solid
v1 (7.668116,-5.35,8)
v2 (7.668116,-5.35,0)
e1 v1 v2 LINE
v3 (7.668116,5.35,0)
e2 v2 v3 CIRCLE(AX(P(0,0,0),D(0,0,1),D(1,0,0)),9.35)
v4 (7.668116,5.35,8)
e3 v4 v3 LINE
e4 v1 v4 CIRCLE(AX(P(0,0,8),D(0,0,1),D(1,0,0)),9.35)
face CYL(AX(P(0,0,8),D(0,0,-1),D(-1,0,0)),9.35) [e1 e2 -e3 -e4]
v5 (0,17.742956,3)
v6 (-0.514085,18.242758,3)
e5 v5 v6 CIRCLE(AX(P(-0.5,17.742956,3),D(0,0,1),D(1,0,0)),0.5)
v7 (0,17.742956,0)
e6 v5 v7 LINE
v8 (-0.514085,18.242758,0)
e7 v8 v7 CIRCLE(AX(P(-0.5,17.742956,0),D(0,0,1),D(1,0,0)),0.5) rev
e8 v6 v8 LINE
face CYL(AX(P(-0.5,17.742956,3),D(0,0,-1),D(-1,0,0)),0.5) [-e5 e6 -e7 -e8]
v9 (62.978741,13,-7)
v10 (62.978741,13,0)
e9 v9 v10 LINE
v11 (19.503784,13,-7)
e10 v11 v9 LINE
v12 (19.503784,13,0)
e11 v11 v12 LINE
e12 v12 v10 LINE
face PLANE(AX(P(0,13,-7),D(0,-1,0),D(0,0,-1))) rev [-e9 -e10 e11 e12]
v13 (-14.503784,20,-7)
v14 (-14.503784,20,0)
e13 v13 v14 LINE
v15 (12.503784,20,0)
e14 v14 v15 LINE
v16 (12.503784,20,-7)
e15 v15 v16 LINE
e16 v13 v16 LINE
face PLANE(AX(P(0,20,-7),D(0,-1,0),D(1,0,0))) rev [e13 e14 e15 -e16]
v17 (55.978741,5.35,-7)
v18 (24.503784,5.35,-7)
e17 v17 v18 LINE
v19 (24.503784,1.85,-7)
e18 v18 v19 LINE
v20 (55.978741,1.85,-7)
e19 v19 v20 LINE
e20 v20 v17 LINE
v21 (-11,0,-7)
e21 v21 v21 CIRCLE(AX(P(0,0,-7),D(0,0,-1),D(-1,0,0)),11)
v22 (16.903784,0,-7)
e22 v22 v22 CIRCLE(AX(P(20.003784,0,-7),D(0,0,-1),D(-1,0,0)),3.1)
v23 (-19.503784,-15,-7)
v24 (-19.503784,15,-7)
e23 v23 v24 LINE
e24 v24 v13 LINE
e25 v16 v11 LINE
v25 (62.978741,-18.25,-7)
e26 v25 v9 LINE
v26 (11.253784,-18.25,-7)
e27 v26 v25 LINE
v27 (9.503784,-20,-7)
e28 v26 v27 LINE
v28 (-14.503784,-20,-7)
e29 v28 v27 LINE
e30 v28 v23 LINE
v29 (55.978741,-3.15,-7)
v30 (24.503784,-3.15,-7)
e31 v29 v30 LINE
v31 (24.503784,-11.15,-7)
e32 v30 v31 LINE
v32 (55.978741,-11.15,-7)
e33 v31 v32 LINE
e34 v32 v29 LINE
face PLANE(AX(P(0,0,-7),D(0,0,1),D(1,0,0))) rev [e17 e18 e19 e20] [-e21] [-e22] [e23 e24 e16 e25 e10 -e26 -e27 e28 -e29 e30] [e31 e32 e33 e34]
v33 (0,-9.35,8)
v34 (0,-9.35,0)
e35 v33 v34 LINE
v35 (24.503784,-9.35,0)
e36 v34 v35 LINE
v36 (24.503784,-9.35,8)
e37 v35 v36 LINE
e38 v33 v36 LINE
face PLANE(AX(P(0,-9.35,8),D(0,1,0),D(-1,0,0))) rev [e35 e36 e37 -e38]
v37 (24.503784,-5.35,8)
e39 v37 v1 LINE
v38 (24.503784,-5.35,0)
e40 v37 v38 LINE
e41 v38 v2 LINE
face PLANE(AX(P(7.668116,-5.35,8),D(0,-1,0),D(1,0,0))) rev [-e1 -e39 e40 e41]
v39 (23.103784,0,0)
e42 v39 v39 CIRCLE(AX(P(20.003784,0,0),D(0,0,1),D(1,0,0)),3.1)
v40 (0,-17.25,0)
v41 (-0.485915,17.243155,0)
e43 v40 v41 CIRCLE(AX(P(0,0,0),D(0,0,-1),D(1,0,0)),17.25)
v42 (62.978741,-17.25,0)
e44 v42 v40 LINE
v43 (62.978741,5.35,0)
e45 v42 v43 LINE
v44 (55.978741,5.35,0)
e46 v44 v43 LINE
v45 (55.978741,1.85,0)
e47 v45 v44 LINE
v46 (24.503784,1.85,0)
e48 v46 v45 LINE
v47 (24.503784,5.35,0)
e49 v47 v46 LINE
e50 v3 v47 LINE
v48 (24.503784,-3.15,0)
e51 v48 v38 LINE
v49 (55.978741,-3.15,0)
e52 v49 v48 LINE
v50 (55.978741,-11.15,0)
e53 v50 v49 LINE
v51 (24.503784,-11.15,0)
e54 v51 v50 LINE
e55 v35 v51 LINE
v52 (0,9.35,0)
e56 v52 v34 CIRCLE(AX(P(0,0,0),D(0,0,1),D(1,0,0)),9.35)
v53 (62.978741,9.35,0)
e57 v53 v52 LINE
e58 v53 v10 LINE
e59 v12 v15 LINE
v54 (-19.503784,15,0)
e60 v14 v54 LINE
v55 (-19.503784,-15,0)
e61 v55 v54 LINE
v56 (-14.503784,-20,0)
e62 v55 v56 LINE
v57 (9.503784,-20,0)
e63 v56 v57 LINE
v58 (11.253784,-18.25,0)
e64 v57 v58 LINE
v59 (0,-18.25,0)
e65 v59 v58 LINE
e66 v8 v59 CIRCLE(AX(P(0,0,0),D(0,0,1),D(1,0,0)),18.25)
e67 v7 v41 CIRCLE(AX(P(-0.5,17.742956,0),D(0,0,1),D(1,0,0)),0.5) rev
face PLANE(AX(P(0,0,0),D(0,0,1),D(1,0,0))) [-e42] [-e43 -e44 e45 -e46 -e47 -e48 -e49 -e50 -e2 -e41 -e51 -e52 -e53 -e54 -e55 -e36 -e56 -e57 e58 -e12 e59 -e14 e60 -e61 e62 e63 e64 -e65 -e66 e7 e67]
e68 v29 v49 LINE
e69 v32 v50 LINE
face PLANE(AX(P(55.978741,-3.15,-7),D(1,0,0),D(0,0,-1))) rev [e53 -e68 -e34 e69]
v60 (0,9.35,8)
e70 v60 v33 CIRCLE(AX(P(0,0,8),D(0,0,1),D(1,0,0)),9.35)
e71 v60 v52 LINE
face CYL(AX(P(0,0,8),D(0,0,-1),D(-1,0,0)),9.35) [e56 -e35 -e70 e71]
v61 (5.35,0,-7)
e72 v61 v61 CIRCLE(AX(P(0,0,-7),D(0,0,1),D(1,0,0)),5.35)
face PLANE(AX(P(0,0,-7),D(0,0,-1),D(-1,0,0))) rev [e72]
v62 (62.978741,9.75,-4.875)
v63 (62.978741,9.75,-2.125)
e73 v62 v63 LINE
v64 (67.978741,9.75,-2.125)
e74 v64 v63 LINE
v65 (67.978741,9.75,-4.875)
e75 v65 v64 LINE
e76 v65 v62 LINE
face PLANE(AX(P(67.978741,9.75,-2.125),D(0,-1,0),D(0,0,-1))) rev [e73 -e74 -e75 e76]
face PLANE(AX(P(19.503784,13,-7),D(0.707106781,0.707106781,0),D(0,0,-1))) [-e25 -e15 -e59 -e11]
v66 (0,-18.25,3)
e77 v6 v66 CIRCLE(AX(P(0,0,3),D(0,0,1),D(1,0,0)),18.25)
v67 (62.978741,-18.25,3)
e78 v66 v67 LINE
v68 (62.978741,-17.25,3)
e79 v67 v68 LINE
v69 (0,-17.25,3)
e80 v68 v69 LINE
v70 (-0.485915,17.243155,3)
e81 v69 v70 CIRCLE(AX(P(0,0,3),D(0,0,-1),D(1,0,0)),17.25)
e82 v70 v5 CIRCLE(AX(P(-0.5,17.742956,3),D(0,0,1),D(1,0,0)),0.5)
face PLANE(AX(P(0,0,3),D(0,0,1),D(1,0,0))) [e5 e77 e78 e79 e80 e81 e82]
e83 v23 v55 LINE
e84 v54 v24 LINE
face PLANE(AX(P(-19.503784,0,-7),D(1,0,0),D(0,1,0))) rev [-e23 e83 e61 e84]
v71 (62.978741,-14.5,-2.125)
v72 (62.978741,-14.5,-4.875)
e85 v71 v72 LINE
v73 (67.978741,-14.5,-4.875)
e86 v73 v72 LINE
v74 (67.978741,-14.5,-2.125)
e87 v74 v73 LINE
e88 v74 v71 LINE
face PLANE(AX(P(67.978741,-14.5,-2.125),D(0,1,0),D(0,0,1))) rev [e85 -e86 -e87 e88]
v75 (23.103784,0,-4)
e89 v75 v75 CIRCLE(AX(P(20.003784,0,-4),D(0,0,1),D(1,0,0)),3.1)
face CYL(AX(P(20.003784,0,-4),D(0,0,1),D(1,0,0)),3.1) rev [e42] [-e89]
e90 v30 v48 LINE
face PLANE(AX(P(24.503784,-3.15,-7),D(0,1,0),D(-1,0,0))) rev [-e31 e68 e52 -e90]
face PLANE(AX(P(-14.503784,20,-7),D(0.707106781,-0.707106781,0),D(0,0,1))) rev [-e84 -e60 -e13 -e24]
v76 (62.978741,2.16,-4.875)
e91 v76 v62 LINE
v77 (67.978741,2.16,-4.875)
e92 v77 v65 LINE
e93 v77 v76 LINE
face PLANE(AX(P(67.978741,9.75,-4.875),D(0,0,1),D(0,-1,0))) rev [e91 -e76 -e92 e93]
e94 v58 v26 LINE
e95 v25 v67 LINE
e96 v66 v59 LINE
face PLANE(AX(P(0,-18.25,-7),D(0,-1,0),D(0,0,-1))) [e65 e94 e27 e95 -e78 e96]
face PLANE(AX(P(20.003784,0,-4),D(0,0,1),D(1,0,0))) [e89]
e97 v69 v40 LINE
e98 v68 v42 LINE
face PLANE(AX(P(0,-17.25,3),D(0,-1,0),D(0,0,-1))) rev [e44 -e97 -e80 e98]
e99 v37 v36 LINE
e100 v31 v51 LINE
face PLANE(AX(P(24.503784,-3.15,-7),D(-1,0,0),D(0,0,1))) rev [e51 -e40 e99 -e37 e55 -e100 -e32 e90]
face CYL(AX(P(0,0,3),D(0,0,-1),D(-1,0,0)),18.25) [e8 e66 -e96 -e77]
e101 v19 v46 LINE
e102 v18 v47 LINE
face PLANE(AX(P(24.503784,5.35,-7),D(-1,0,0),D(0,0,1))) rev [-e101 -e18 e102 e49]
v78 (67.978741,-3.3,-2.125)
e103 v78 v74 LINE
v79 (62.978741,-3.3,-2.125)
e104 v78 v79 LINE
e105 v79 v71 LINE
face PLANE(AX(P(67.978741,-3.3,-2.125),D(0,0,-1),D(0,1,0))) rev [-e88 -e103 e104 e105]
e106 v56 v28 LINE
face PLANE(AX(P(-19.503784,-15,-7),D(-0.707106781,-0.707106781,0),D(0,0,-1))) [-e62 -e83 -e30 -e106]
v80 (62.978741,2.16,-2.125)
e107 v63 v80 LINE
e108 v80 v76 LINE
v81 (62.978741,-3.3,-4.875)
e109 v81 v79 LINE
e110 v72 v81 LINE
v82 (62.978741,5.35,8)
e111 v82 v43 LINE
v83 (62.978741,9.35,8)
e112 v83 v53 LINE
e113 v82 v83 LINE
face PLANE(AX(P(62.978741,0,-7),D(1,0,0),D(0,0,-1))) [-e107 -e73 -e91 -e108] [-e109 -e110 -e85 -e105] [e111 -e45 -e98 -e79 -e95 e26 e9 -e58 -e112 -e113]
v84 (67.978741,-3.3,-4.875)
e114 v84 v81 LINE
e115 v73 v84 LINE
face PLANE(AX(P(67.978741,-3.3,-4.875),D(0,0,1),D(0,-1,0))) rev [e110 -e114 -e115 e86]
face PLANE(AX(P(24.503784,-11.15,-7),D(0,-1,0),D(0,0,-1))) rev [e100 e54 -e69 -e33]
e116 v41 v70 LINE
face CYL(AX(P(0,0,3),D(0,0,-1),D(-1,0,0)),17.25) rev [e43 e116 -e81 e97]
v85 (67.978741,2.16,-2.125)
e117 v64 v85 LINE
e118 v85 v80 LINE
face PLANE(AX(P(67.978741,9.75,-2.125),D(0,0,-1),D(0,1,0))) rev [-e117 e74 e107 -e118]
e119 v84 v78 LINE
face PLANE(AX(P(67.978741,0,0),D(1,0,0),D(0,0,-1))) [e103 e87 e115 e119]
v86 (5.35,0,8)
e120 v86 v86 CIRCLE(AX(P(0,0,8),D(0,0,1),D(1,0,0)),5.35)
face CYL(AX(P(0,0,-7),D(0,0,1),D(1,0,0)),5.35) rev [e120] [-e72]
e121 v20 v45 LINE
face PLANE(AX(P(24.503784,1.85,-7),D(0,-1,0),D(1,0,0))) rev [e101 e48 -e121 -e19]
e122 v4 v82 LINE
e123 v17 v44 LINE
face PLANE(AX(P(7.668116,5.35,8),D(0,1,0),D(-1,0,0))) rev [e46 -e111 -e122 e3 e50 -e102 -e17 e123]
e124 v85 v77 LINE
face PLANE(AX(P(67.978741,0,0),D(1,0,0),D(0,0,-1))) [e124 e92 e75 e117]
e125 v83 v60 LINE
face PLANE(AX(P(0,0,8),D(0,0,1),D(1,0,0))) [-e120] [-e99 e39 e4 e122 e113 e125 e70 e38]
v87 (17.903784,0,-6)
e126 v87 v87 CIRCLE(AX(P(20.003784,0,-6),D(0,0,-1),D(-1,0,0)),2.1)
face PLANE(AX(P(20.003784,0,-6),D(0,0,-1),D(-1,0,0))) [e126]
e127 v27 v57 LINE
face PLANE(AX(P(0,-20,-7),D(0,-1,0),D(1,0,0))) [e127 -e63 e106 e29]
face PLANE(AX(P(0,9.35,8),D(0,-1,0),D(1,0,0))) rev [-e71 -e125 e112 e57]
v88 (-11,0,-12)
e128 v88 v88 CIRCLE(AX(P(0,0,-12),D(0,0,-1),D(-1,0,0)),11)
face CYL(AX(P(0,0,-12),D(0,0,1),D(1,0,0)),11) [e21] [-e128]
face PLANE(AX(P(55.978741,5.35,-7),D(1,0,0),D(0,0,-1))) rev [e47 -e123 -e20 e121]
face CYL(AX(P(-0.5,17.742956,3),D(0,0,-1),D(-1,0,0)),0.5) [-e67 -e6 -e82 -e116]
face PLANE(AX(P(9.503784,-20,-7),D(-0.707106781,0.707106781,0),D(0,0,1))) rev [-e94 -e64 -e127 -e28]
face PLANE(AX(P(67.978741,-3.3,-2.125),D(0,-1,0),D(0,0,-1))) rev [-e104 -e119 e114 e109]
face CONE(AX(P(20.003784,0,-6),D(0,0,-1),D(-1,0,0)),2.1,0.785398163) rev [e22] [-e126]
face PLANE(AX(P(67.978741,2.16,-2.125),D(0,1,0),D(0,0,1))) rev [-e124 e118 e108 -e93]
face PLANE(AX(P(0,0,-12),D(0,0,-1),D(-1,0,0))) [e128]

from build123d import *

# Parameters (mm, degrees)
SKETCH1_R               = 5.35
BOSS_EXTRUDE2_DEPTH     = 7
BOSS_EXTRUDE3_START     = 8
SKETCH3_R               = 5.35
BOSS_EXTRUDE3_DEPTH     = 8
BOSS_EXTRUDE4_DEPTH     = 3
CHAMFER1_SIZE           = 10
CHAMFER2_SIZE           = 5
CUT_EXTRUDE1_DEPTH      = 67.560662475
CUT_EXTRUDE1_DEPTH_BACK = 67.560662475
SKETCH5_W               = 31.474956737
SKETCH5_H               = 3.5
SKETCH5_H_2             = 8
CHAMFER3_SIZE           = 7
SKETCH6_W               = 2.75
SKETCH6_H               = 7.59
SKETCH6_H_2             = 11.2
BOSS_EXTRUDE5_DEPTH     = 5
SKETCH7_R               = 11
BOSS_EXTRUDE6_DEPTH     = 5
CUT_EXTRUDE2_REACH      = 87.717
SKETCH8_W               = 8
SKETCH8_H               = 4
SKETCH9_R               = 3.1
CUT_EXTRUDE3_DEPTH      = 4
CUT_EXTRUDE4_START      = -1
SKETCH10_R              = 3.1
CUT_EXTRUDE4_DEPTH      = 1
CHAMFER4_SIZE           = 1
FILLET3_R               = 0.5


# Some blends are built 0.0001 mm under size
with BuildPart() as part:
    # Sketch1 → Boss-Extrude2 (new body)
    with BuildSketch(Plane.XY):
        Polygon((-19.503784034, -20), (19.503784034, -20), (19.503784034, -18.25), (62.978740771, -18.25), (62.978740771, 13), (19.503784034, 13), (19.503784034, 20), (-19.503784034, 20), align=None)
        Circle(SKETCH1_R, mode=Mode.SUBTRACT)
    extrude(amount=-BOSS_EXTRUDE2_DEPTH)

    # Sketch3 → Boss-Extrude3 (add)
    with BuildSketch(Plane.XY.offset(BOSS_EXTRUDE3_START)):
        with BuildLine():
            Line((7.668115805, 5.35), (62.978740771, 5.35))
            Line((62.978740771, 5.35), (62.978740771, 9.35))
            Line((62.978740771, 9.35), (0, 9.35))
            ThreePointArc((0, 9.35), (-9.35, 0), (0, -9.35))
            Line((0, -9.35), (62.978740771, -9.35))
            Line((62.978740771, -9.35), (62.978740771, -5.35))
            Line((62.978740771, -5.35), (7.668115805, -5.35))
            ThreePointArc((7.668115805, -5.35), (9.35, 0), (7.668115805, 5.35))
        make_face()
        Circle(SKETCH3_R, mode=Mode.SUBTRACT)
    extrude(amount=-BOSS_EXTRUDE3_DEPTH)

    # Sketch4 → Boss-Extrude4 (add)
    with BuildSketch(Plane.XY):
        with BuildLine():
            Line((0, -18.25), (62.978740771, -18.25))
            Line((62.978740771, -18.25), (62.978740771, -17.25))
            Line((62.978740771, -17.25), (8.306623863, -17.25))
            Line((8.306623863, -17.25), (0, -17.25))
            ThreePointArc((0, -17.25), (-17.25, 0), (0, 17.25))
            Line((0, 17.25), (0, 18.25))
            ThreePointArc((0, 18.25), (-18.25, 0), (0, -18.25))
        make_face()
    extrude(amount=BOSS_EXTRUDE4_DEPTH)

    # Chamfer1
    # the kernel refuses this chamfer: 10 mm, written as the material it takes off along each edge
    with BuildSketch(Plane(origin=(19.503784034, -20, 25.71682988), x_dir=(-0.9996219169112968, -0.027495876610586317, 0), z_dir=(0, 0, -1))) as chamfer1_piece_1_section:
        Polygon((CHAMFER1_SIZE * 0.999621916911, CHAMFER1_SIZE * 0.0274958766106), (-CHAMFER1_SIZE * 0.0274958766106, CHAMFER1_SIZE * 0.999621916911), (0, 0), align=None)
    chamfer1_piece_1 = extrude(amount=58.433659759, mode=Mode.PRIVATE)
    chamfer1_piece_1 = split(chamfer1_piece_1, bisect_by=Plane(origin=(14.814200223, -18.25, -3.5), z_dir=(0, -1, 0)), keep=Keep.TOP, mode=Mode.PRIVATE)
    add(chamfer1_piece_1, mode=Mode.SUBTRACT)

    # Chamfer2
    chamfer2_edges = [part.edges().sort_by_distance(p)[0] for p in [
        (-19.503784034, -20, -3.5),
        (-19.503784034, 20, -3.5),
    ]]
    chamfer(chamfer2_edges, length=CHAMFER2_SIZE)

    # Sketch5 → Cut-Extrude1 (cut, two sides: drawn at the far end of the back side and taken through both)
    with BuildSketch(Plane.XY.offset(-CUT_EXTRUDE1_DEPTH_BACK)):
        with Locations((40.241262403, 3.6)):
            Rectangle(SKETCH5_W, SKETCH5_H)
        with Locations((40.241262403, -7.15)):
            Rectangle(SKETCH5_W, SKETCH5_H_2)
    extrude(amount=CUT_EXTRUDE1_DEPTH + CUT_EXTRUDE1_DEPTH_BACK, mode=Mode.SUBTRACT)

    # Chamfer3
    chamfer3_edges = [part.edges().sort_by_distance(p)[0] for p in [
        (19.503784034, 20, -3.5),
    ]]
    chamfer(chamfer3_edges, length=CHAMFER3_SIZE - 0.0001)  # a hair under: the kernel refuses the full size

    # Sketch6 → Boss-Extrude5 (add)
    with BuildSketch(Plane(origin=(62.978740771, 0, 0), x_dir=(0, 0, -1), z_dir=(1, 0, 0))):
        with Locations((3.5, 5.955)):
            Rectangle(SKETCH6_W, SKETCH6_H)
        with Locations((3.5, -8.9)):
            Rectangle(SKETCH6_W, SKETCH6_H_2)
    extrude(amount=BOSS_EXTRUDE5_DEPTH)

    # Sketch7 → Boss-Extrude6 (add)
    with BuildSketch(Plane(origin=(0, 0, -7), x_dir=(-1, 0, 0), z_dir=(0, 0, -1))):
        Circle(SKETCH7_R)
    extrude(amount=BOSS_EXTRUDE6_DEPTH)

    # Sketch8 → Cut-Extrude2 (cut, up to next)
    with BuildSketch(Plane(origin=(62.978740771, 0, 0), x_dir=(0, 0, -1), z_dir=(1, 0, 0)), mode=Mode.PRIVATE) as cut_extrude2_sk1:
        with Locations((-4, -7.35)):
            Rectangle(SKETCH8_W, SKETCH8_H)
    cut_extrude2_tool1 = extrude(cut_extrude2_sk1.sketch, amount=-CUT_EXTRUDE2_REACH, mode=Mode.PRIVATE) & part.part
    add(cut_extrude2_tool1.solids().sort_by_distance((62.978741, -7.35, 4))[0], mode=Mode.SUBTRACT)

    # Sketch9 → Cut-Extrude3 (cut)
    with BuildSketch(Plane.XY):
        with Locations((20.003784034, 0)):
            Circle(SKETCH9_R)
    extrude(amount=-CUT_EXTRUDE3_DEPTH, mode=Mode.SUBTRACT)

    # Sketch10 → Cut-Extrude4 (cut)
    with BuildSketch(Plane(origin=(0, 0, -7), x_dir=(-1, 0, 0), z_dir=(0, 0, -1)).offset(CUT_EXTRUDE4_START)):
        with Locations(Location((-20.003784034, 0, 0), (0, 0, 180))):
            Circle(SKETCH10_R)
    extrude(amount=CUT_EXTRUDE4_DEPTH, mode=Mode.SUBTRACT)

    # Chamfer4
    chamfer4_edges = [part.edges().sort_by_distance(p)[0] for p in [
        (16.903784034, 0, -6),
    ]]
    chamfer(chamfer4_edges, length=CHAMFER4_SIZE - 0.0001)  # a hair under: the kernel refuses the full size

    # Fillet3
    fillet3_edges = [part.edges().sort_by_distance(p)[0] for p in [
        (0, 18.25, 1.5),
        (0, 17.25, 1.5),
    ]]
    fillet(fillet3_edges, radius=FILLET3_R - 0.0001)  # a hair under: the kernel refuses the full size


solid = part.part
